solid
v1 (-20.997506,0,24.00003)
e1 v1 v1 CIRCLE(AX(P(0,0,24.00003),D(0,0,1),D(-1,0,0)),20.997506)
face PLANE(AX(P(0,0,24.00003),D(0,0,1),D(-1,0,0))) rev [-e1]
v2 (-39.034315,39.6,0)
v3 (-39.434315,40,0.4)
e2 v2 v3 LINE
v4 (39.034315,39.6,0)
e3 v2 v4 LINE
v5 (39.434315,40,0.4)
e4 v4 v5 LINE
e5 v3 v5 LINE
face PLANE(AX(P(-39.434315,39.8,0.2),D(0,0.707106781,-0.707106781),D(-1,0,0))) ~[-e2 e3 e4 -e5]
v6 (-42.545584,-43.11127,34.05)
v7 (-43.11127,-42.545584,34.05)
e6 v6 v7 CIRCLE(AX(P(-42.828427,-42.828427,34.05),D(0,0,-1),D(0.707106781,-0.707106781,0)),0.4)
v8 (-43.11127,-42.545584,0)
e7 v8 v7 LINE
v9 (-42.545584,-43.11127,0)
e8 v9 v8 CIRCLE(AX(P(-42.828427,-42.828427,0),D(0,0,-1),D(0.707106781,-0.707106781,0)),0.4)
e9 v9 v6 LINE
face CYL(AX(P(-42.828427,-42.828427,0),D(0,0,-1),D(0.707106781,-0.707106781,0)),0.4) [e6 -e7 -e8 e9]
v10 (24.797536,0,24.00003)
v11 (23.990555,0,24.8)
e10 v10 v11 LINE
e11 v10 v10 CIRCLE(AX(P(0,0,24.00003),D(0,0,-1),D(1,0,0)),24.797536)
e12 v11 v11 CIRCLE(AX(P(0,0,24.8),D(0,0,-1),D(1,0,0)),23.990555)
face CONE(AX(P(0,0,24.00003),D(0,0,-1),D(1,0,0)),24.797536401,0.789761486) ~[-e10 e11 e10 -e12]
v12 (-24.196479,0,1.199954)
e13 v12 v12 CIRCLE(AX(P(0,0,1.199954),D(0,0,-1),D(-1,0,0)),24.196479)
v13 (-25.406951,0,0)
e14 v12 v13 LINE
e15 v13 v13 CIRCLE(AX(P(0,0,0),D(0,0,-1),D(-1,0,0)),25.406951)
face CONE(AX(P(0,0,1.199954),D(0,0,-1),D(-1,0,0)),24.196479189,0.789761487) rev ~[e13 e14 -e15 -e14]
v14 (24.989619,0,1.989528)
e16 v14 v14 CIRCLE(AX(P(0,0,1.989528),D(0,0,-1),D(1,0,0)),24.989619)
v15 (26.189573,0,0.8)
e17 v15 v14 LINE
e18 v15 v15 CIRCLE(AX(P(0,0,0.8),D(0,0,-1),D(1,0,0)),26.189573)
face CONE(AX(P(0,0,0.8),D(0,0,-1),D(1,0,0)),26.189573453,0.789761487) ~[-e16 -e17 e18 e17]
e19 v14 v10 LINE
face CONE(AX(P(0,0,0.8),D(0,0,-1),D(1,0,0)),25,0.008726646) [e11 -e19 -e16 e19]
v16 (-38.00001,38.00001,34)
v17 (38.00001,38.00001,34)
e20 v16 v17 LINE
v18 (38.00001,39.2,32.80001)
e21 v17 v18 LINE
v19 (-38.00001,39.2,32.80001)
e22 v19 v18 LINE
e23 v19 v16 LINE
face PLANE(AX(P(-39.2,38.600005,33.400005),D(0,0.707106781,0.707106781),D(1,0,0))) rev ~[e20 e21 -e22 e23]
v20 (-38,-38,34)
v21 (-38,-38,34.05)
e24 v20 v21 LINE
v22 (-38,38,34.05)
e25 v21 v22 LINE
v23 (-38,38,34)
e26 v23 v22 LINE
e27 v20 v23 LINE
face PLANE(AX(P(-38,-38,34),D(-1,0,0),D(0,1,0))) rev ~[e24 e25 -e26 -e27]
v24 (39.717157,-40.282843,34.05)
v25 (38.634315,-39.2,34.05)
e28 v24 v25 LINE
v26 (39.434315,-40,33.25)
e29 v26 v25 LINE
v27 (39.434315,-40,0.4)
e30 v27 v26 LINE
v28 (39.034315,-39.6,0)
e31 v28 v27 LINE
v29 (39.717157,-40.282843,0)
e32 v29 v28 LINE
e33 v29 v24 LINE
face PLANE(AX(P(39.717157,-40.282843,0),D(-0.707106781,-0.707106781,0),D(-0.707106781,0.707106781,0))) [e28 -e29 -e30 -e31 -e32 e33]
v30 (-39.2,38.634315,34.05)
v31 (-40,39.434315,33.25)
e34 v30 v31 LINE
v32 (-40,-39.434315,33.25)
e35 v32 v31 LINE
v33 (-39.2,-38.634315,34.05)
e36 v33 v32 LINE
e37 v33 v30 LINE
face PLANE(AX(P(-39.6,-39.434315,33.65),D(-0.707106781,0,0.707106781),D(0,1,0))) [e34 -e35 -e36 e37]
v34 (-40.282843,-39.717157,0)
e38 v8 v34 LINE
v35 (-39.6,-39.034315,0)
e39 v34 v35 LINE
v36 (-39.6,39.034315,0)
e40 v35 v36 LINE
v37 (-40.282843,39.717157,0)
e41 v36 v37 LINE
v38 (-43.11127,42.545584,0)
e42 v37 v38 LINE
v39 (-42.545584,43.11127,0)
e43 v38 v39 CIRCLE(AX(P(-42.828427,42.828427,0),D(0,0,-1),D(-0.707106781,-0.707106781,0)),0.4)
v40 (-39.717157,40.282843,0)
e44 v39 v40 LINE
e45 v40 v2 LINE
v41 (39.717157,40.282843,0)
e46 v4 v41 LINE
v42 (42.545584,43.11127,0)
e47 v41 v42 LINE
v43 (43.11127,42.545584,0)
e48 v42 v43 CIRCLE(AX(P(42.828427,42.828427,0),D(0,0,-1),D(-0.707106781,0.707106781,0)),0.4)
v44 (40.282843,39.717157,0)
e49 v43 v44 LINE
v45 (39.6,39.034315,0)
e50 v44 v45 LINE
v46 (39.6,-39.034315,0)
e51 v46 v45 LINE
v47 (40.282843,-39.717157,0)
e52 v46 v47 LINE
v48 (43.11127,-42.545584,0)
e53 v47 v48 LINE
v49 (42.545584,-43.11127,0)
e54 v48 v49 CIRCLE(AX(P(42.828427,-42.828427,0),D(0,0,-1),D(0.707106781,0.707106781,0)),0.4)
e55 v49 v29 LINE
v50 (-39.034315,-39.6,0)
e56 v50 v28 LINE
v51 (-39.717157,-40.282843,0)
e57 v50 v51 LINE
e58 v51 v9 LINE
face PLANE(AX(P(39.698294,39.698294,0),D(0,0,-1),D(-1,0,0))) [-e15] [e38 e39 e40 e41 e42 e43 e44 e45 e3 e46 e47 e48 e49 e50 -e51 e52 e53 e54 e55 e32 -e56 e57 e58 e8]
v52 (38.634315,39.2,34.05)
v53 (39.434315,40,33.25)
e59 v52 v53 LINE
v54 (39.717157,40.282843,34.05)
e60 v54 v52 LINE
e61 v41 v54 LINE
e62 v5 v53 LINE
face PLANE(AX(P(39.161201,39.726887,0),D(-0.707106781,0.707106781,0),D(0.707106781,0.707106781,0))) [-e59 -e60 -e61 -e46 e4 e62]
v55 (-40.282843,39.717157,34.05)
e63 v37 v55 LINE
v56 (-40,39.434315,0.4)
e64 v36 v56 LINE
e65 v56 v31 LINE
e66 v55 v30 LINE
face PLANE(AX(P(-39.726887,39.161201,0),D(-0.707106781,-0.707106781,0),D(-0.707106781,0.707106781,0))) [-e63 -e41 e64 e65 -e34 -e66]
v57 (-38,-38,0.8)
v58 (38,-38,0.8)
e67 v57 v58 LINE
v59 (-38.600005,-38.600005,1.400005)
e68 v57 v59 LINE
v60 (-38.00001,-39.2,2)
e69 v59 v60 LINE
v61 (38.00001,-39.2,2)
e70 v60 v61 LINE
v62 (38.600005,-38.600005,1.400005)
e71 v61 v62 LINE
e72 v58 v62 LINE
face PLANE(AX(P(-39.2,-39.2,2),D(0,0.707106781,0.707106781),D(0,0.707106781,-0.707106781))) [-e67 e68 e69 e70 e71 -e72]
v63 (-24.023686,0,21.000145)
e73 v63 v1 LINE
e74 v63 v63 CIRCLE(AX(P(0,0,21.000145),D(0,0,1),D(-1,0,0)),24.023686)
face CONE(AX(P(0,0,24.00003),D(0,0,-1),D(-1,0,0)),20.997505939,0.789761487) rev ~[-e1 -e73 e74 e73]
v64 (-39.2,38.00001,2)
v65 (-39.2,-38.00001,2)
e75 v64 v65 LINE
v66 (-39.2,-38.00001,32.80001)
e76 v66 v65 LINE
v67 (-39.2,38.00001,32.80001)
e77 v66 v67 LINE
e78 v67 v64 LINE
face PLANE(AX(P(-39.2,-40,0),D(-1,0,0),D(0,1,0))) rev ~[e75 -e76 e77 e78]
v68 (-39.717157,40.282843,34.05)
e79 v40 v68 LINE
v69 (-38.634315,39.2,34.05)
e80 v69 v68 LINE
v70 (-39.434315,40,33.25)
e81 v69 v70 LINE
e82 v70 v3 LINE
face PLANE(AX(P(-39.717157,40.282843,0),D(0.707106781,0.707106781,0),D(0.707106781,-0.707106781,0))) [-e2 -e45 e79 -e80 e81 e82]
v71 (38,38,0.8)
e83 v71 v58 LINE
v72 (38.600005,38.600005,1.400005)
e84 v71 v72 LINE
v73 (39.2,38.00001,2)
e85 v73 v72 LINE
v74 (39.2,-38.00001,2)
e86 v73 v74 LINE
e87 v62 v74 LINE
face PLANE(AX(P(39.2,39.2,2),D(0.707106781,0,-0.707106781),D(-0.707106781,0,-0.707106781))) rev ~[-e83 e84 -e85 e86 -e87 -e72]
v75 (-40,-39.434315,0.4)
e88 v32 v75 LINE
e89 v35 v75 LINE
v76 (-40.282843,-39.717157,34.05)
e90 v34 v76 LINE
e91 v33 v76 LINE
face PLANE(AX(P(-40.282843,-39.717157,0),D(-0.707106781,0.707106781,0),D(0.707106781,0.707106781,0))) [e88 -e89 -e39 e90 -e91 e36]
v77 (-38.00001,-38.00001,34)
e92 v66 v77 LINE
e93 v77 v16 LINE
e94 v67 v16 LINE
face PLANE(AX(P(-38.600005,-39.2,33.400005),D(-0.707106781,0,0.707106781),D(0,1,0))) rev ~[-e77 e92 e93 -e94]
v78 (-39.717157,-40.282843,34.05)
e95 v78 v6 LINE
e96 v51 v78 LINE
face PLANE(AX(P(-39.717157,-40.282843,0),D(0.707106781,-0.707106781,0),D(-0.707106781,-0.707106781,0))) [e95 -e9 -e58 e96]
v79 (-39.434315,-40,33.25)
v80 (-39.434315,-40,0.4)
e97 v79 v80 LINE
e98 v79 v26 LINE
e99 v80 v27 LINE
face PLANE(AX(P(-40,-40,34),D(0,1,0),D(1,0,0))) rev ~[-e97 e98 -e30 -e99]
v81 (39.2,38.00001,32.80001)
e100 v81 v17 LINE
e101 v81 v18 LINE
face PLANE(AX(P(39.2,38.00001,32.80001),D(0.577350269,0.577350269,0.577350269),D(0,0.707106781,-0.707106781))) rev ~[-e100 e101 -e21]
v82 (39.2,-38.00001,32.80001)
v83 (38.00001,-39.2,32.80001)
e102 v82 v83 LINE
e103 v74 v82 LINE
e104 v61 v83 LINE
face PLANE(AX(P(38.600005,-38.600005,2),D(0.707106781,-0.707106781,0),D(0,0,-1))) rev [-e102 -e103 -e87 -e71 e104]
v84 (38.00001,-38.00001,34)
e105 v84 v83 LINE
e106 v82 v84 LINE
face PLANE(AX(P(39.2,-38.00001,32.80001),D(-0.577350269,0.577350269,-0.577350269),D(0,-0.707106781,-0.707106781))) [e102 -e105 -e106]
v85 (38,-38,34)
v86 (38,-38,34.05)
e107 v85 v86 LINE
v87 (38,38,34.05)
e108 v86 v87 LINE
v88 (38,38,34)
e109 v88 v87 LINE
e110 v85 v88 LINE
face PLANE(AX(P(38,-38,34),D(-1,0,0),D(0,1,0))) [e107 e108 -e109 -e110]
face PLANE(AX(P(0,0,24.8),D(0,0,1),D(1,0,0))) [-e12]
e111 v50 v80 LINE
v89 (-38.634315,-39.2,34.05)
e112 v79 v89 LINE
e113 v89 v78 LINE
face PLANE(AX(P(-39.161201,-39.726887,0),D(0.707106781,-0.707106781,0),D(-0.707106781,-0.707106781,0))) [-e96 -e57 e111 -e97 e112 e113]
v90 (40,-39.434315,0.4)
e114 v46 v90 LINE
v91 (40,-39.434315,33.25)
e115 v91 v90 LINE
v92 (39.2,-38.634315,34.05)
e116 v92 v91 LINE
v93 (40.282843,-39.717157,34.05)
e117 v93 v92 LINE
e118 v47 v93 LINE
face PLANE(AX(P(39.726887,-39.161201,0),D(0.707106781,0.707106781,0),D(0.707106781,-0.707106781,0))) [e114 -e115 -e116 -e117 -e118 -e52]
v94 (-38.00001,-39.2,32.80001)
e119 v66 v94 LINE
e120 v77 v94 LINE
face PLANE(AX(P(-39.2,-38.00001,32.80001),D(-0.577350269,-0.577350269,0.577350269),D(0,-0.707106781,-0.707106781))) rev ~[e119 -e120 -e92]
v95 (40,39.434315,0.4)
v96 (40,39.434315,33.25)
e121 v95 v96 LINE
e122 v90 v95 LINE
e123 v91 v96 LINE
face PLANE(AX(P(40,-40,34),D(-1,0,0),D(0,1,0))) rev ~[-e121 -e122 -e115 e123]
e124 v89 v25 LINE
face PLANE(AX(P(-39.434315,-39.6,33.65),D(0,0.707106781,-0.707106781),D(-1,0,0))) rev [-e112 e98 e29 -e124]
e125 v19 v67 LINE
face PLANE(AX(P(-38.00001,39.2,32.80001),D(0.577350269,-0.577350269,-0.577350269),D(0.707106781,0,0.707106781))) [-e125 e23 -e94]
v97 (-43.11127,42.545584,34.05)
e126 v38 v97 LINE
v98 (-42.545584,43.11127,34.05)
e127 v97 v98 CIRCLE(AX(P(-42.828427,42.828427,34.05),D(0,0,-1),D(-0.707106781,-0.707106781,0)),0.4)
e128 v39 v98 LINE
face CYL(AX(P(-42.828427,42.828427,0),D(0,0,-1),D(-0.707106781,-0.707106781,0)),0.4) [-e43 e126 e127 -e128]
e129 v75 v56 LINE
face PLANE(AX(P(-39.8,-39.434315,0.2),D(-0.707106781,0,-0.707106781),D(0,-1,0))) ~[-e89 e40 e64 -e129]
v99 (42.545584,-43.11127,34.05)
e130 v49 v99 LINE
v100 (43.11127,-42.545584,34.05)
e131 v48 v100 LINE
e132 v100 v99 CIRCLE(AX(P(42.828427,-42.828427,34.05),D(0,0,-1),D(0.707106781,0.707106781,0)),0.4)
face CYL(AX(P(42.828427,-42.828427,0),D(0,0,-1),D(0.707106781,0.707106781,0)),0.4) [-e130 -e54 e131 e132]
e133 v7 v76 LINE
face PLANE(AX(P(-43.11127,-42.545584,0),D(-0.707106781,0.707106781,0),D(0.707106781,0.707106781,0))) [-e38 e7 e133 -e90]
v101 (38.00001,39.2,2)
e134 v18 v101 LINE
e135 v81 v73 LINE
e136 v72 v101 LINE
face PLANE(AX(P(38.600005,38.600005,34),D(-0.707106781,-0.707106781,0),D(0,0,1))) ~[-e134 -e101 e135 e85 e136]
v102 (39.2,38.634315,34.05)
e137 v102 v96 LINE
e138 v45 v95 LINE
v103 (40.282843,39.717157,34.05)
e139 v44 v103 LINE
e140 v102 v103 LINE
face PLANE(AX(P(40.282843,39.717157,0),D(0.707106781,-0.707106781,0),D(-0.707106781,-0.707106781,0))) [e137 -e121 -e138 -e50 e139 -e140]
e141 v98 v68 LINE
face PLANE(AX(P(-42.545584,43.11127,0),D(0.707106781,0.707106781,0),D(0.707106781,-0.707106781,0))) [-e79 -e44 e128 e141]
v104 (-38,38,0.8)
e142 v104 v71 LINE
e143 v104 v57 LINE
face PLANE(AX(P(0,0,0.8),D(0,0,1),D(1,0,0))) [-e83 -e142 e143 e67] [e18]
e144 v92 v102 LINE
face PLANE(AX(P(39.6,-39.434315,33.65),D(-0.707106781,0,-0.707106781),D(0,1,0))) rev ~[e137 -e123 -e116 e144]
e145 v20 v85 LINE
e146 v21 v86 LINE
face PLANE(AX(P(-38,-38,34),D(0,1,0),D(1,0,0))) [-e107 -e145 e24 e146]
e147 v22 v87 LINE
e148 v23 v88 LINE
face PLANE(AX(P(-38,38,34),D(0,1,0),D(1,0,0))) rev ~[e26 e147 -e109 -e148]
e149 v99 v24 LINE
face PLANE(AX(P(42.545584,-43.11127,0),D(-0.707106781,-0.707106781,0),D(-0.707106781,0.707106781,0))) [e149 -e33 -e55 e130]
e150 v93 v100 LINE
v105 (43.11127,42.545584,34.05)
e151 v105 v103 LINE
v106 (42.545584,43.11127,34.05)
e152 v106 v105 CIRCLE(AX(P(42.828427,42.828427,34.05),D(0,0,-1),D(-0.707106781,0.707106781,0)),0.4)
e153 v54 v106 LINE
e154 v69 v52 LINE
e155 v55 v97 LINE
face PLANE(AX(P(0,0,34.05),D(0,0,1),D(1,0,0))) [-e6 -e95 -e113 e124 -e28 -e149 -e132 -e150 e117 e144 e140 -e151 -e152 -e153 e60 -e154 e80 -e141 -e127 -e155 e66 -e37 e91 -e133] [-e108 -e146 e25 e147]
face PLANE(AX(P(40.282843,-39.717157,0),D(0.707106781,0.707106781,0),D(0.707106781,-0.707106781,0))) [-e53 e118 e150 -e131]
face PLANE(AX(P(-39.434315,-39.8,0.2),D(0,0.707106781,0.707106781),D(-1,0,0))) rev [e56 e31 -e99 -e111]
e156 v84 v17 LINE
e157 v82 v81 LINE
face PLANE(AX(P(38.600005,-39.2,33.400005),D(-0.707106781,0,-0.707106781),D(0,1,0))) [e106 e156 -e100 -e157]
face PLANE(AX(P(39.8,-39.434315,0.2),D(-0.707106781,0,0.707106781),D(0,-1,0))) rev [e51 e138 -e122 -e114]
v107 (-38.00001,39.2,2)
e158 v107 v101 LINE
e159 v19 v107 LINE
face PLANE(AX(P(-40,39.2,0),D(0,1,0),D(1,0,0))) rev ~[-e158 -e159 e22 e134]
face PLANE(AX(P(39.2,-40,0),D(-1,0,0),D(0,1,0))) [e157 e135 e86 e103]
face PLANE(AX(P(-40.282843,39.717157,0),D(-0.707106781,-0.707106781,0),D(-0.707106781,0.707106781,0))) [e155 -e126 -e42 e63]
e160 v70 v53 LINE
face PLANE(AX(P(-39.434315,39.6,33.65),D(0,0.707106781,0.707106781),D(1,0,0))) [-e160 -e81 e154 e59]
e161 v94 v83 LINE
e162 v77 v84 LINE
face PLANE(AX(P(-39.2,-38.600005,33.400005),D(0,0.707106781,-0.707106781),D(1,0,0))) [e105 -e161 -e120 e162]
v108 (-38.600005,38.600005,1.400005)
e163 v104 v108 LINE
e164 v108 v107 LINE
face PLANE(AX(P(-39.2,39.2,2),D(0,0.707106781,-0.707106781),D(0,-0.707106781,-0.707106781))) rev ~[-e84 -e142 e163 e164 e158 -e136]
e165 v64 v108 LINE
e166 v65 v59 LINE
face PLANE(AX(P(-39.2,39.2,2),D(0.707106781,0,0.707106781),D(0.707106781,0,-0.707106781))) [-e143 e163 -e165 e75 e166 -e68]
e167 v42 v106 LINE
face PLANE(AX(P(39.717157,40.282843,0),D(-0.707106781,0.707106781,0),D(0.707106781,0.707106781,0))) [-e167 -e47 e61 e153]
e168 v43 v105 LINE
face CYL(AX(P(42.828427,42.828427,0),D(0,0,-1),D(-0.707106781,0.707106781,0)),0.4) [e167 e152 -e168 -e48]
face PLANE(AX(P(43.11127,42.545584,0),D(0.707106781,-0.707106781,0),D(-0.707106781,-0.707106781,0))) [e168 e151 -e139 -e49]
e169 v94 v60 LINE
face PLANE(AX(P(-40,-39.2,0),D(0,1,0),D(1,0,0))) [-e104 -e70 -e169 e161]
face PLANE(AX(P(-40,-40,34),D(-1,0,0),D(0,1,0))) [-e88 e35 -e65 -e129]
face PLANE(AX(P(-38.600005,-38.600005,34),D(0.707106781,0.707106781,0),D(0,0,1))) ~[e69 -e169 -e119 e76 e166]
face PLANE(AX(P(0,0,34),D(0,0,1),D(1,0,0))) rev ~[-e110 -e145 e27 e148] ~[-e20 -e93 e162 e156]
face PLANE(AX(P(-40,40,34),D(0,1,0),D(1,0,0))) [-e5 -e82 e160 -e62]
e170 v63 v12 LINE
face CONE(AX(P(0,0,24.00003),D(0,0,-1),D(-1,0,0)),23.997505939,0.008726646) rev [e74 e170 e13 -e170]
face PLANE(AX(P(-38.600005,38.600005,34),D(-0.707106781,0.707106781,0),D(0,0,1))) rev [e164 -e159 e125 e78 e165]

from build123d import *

# Parameters (mm, degrees)
F0_W             = 80
F0_H             = 80
F1_DEPTH         = 34
F2_T             = -0.8
F3_R             = 25
F4_DEPTH         = 24
F4_TAPER         = 0.5
F5_T1_DEPTH      = 78.4
F5_T3_DEPTH      = 78.4
F6_W             = 80
F6_H             = 80
F6_W_2           = 76
F6_H_2           = 76
F7_DEPTH         = 0.05
F8_SIZE          = 1.19999
F11_DEPTH        = 34.05
F11_COPIES_COUNT = 4
F14_SIZE         = 3
F16_SIZE         = 0.4
F17_SIZE         = 0.8


# Not quite as in the source:
# - a fillet or chamfer that OpenCascade refuses, or shapes differently, is made with other operations: its cross-section is extruded or revolved along the edge and cut away or added
# - a fillet or chamfer is up to 0.001 mm smaller than in the source, because OpenCascade refuses the exact size
# - a pattern or mirror of a feature is missing from the dataset's text; its kind, count and spacing are read off the source's solid


with BuildPart() as f1:
    # F0 (on Top) → F1 (new body)
    with BuildSketch(Plane.XY):
        Rectangle(F0_W, F0_H)
    extrude(amount=F1_DEPTH)

    # F2
    f2_openings = [f1.faces().sort_by_distance(p)[0] for p in [
        (0, 0, 34),
    ]]
    offset(amount=F2_T, openings=f2_openings)

    # F3 (on face) → F4 (join)
    with BuildSketch(Plane.XY.offset(0.8)):
        Circle(F3_R)
    extrude(amount=F4_DEPTH, taper=F4_TAPER)

    # F5: chamfer of 1.2 on 5 edges, made by hand

    # F5_s2 → F5_t1 (join)
    with BuildSketch(Plane.XZ.offset(-39.2)):
        Polygon((-39.2, 2), (-38, 0.8), (-39.2, 0.8), align=None)
        Polygon((39.2, 2), (38, 0.8), (39.2, 0.8), align=None)
    extrude(amount=F5_T1_DEPTH)

    # F5_s4 → F5_t3 (join)
    with BuildSketch(Plane.YZ.offset(-39.2)):
        Polygon((-39.2, 2), (-38, 0.8), (-39.2, 0.8), align=None)
        Polygon((39.2, 2), (38, 0.8), (39.2, 0.8), align=None)
    extrude(amount=F5_T3_DEPTH)

    # F5_s5 → F5_t6 (revolve)
    with BuildSketch(Plane.XZ):
        Polygon((26.1895734527, 0.8), (24.989619145, 1.9895281574), (25, 0.8), align=None)
    revolve(axis=Axis((0, 0, 0.8), (0, 0, -1)))

    # F6 (on face) → F7 (join)
    with BuildSketch(Plane.XY.offset(34)):
        Rectangle(F6_W, F6_H)
        Rectangle(F6_W_2, F6_H_2, mode=Mode.SUBTRACT)
    extrude(amount=F7_DEPTH)

    # F8 (size 1.2 in the source; OpenCascade refuses exactly that, so slightly less here)
    f8_edges = [f1.edges().sort_by_distance(p)[0] for p in [
        (0, -39.2, 34),
        (-39.2, 0, 34),
        (-39.2, -39.2, 18),
        (-39.2, 39.2, 18),
        (0, 39.2, 34),
        (39.2, 0, 34),
        (39.2, 39.2, 18),
        (39.2, -39.2, 18),
    ]]
    chamfer(f8_edges, length=F8_SIZE)

    # F9: chamfer of 0.8 on 1 edges, made by hand

    # F9_s1 → F9_t2 (revolve, cut)
    with BuildSketch(Plane.XZ):
        Polygon((24.7975364014, 24.0000304615), (23.990555173, 24.8), (24.790555173, 24.8), align=None)
    revolve(axis=Axis((0, 0, 24.8), (0, 0, -1)), mode=Mode.SUBTRACT)

    # F10 (on face) → F11 (join, through all)
    with BuildSketch(Plane(origin=(0, 0, 0), x_dir=(1, 0, 0), z_dir=(0, 0, -1))):
        with BuildLine():
            Line((-39.1612012219, 39.7268866468), (-39.7171572875, 40.2828427125))
            ThreePointArc((-39.7171572875, 40.2828427125), (-39.7171572875, 39.7171572875), (-40.2828427125, 39.7171572875))
            Line((-40.2828427125, 39.7171572875), (-39.7268866468, 39.1612012219))
            Line((-39.7268866468, 39.1612012219), (-39.1612012219, 39.7268866468))
        make_face()
        with BuildLine():
            ThreePointArc((-40.2828427125, 39.7171572875), (-39.7171572875, 39.7171572875), (-39.7171572875, 40.2828427125))
            Line((-39.7171572875, 40.2828427125), (-42.5455844123, 43.1112698372))
            ThreePointArc((-42.5455844123, 43.1112698372), (-43.1112698372, 43.1112698372), (-43.1112698372, 42.5455844123))
            Line((-43.1112698372, 42.5455844123), (-40.2828427125, 39.7171572875))
        make_face()
    f11 = extrude(amount=-F11_DEPTH)

    # F11_copies: F11 ×4 about axis
    f11_copies_axis = Axis((0, 0, 0), (0, 0, 1))
    for i in range(1, F11_COPIES_COUNT):
        add(f11.rotate(f11_copies_axis, i * 360 / F11_COPIES_COUNT))

    # F12 (on Front) → F13 (revolve, cut)
    with BuildSketch(Plane.XZ):
        Polygon((-23.9975059387, 24.0000304615), (-24.2264749318, -2.2372173829), (0, -2.2372173829), (0, 24.0000304615), align=None)
    revolve(axis=Axis((0, 0, 10.8814065393), (0, 0, 1)), mode=Mode.SUBTRACT)

    # F14
    f14_edges = [f1.edges().sort_by_distance(p)[0] for p in [
        (23.997506, 0, 24.00003),
    ]]
    chamfer(f14_edges, length=F14_SIZE)

    # F15: chamfer of 1.2 on 1 edges, made by hand

    # F15_s1 → F15_t2 (revolve, cut)
    with BuildSketch(Plane.XZ):
        Polygon((-24.1964791889, 1.1999543077), (-25.4069510315, 0), (-24.2069510315, 0), align=None)
    revolve(axis=Axis((0, 0, 0), (0, 0, -1)), mode=Mode.SUBTRACT)

    # F16
    f16_edges = [f1.edges().sort_by_distance(p)[0] for p in [
        (0, -40, 0),
        (-40, 0, 0),
        (40, 0, 0),
        (0, 40, 0),
    ]]
    chamfer(f16_edges, length=F16_SIZE)

    # F17
    f17_edges = [f1.edges().sort_by_distance(p)[0] for p in [
        (0, -40, 34.05),
        (40, 0, 34.05),
        (0, 40, 34.05),
        (-40, 0, 34.05),
    ]]
    chamfer(f17_edges, length=F17_SIZE)


solid = f1.part
